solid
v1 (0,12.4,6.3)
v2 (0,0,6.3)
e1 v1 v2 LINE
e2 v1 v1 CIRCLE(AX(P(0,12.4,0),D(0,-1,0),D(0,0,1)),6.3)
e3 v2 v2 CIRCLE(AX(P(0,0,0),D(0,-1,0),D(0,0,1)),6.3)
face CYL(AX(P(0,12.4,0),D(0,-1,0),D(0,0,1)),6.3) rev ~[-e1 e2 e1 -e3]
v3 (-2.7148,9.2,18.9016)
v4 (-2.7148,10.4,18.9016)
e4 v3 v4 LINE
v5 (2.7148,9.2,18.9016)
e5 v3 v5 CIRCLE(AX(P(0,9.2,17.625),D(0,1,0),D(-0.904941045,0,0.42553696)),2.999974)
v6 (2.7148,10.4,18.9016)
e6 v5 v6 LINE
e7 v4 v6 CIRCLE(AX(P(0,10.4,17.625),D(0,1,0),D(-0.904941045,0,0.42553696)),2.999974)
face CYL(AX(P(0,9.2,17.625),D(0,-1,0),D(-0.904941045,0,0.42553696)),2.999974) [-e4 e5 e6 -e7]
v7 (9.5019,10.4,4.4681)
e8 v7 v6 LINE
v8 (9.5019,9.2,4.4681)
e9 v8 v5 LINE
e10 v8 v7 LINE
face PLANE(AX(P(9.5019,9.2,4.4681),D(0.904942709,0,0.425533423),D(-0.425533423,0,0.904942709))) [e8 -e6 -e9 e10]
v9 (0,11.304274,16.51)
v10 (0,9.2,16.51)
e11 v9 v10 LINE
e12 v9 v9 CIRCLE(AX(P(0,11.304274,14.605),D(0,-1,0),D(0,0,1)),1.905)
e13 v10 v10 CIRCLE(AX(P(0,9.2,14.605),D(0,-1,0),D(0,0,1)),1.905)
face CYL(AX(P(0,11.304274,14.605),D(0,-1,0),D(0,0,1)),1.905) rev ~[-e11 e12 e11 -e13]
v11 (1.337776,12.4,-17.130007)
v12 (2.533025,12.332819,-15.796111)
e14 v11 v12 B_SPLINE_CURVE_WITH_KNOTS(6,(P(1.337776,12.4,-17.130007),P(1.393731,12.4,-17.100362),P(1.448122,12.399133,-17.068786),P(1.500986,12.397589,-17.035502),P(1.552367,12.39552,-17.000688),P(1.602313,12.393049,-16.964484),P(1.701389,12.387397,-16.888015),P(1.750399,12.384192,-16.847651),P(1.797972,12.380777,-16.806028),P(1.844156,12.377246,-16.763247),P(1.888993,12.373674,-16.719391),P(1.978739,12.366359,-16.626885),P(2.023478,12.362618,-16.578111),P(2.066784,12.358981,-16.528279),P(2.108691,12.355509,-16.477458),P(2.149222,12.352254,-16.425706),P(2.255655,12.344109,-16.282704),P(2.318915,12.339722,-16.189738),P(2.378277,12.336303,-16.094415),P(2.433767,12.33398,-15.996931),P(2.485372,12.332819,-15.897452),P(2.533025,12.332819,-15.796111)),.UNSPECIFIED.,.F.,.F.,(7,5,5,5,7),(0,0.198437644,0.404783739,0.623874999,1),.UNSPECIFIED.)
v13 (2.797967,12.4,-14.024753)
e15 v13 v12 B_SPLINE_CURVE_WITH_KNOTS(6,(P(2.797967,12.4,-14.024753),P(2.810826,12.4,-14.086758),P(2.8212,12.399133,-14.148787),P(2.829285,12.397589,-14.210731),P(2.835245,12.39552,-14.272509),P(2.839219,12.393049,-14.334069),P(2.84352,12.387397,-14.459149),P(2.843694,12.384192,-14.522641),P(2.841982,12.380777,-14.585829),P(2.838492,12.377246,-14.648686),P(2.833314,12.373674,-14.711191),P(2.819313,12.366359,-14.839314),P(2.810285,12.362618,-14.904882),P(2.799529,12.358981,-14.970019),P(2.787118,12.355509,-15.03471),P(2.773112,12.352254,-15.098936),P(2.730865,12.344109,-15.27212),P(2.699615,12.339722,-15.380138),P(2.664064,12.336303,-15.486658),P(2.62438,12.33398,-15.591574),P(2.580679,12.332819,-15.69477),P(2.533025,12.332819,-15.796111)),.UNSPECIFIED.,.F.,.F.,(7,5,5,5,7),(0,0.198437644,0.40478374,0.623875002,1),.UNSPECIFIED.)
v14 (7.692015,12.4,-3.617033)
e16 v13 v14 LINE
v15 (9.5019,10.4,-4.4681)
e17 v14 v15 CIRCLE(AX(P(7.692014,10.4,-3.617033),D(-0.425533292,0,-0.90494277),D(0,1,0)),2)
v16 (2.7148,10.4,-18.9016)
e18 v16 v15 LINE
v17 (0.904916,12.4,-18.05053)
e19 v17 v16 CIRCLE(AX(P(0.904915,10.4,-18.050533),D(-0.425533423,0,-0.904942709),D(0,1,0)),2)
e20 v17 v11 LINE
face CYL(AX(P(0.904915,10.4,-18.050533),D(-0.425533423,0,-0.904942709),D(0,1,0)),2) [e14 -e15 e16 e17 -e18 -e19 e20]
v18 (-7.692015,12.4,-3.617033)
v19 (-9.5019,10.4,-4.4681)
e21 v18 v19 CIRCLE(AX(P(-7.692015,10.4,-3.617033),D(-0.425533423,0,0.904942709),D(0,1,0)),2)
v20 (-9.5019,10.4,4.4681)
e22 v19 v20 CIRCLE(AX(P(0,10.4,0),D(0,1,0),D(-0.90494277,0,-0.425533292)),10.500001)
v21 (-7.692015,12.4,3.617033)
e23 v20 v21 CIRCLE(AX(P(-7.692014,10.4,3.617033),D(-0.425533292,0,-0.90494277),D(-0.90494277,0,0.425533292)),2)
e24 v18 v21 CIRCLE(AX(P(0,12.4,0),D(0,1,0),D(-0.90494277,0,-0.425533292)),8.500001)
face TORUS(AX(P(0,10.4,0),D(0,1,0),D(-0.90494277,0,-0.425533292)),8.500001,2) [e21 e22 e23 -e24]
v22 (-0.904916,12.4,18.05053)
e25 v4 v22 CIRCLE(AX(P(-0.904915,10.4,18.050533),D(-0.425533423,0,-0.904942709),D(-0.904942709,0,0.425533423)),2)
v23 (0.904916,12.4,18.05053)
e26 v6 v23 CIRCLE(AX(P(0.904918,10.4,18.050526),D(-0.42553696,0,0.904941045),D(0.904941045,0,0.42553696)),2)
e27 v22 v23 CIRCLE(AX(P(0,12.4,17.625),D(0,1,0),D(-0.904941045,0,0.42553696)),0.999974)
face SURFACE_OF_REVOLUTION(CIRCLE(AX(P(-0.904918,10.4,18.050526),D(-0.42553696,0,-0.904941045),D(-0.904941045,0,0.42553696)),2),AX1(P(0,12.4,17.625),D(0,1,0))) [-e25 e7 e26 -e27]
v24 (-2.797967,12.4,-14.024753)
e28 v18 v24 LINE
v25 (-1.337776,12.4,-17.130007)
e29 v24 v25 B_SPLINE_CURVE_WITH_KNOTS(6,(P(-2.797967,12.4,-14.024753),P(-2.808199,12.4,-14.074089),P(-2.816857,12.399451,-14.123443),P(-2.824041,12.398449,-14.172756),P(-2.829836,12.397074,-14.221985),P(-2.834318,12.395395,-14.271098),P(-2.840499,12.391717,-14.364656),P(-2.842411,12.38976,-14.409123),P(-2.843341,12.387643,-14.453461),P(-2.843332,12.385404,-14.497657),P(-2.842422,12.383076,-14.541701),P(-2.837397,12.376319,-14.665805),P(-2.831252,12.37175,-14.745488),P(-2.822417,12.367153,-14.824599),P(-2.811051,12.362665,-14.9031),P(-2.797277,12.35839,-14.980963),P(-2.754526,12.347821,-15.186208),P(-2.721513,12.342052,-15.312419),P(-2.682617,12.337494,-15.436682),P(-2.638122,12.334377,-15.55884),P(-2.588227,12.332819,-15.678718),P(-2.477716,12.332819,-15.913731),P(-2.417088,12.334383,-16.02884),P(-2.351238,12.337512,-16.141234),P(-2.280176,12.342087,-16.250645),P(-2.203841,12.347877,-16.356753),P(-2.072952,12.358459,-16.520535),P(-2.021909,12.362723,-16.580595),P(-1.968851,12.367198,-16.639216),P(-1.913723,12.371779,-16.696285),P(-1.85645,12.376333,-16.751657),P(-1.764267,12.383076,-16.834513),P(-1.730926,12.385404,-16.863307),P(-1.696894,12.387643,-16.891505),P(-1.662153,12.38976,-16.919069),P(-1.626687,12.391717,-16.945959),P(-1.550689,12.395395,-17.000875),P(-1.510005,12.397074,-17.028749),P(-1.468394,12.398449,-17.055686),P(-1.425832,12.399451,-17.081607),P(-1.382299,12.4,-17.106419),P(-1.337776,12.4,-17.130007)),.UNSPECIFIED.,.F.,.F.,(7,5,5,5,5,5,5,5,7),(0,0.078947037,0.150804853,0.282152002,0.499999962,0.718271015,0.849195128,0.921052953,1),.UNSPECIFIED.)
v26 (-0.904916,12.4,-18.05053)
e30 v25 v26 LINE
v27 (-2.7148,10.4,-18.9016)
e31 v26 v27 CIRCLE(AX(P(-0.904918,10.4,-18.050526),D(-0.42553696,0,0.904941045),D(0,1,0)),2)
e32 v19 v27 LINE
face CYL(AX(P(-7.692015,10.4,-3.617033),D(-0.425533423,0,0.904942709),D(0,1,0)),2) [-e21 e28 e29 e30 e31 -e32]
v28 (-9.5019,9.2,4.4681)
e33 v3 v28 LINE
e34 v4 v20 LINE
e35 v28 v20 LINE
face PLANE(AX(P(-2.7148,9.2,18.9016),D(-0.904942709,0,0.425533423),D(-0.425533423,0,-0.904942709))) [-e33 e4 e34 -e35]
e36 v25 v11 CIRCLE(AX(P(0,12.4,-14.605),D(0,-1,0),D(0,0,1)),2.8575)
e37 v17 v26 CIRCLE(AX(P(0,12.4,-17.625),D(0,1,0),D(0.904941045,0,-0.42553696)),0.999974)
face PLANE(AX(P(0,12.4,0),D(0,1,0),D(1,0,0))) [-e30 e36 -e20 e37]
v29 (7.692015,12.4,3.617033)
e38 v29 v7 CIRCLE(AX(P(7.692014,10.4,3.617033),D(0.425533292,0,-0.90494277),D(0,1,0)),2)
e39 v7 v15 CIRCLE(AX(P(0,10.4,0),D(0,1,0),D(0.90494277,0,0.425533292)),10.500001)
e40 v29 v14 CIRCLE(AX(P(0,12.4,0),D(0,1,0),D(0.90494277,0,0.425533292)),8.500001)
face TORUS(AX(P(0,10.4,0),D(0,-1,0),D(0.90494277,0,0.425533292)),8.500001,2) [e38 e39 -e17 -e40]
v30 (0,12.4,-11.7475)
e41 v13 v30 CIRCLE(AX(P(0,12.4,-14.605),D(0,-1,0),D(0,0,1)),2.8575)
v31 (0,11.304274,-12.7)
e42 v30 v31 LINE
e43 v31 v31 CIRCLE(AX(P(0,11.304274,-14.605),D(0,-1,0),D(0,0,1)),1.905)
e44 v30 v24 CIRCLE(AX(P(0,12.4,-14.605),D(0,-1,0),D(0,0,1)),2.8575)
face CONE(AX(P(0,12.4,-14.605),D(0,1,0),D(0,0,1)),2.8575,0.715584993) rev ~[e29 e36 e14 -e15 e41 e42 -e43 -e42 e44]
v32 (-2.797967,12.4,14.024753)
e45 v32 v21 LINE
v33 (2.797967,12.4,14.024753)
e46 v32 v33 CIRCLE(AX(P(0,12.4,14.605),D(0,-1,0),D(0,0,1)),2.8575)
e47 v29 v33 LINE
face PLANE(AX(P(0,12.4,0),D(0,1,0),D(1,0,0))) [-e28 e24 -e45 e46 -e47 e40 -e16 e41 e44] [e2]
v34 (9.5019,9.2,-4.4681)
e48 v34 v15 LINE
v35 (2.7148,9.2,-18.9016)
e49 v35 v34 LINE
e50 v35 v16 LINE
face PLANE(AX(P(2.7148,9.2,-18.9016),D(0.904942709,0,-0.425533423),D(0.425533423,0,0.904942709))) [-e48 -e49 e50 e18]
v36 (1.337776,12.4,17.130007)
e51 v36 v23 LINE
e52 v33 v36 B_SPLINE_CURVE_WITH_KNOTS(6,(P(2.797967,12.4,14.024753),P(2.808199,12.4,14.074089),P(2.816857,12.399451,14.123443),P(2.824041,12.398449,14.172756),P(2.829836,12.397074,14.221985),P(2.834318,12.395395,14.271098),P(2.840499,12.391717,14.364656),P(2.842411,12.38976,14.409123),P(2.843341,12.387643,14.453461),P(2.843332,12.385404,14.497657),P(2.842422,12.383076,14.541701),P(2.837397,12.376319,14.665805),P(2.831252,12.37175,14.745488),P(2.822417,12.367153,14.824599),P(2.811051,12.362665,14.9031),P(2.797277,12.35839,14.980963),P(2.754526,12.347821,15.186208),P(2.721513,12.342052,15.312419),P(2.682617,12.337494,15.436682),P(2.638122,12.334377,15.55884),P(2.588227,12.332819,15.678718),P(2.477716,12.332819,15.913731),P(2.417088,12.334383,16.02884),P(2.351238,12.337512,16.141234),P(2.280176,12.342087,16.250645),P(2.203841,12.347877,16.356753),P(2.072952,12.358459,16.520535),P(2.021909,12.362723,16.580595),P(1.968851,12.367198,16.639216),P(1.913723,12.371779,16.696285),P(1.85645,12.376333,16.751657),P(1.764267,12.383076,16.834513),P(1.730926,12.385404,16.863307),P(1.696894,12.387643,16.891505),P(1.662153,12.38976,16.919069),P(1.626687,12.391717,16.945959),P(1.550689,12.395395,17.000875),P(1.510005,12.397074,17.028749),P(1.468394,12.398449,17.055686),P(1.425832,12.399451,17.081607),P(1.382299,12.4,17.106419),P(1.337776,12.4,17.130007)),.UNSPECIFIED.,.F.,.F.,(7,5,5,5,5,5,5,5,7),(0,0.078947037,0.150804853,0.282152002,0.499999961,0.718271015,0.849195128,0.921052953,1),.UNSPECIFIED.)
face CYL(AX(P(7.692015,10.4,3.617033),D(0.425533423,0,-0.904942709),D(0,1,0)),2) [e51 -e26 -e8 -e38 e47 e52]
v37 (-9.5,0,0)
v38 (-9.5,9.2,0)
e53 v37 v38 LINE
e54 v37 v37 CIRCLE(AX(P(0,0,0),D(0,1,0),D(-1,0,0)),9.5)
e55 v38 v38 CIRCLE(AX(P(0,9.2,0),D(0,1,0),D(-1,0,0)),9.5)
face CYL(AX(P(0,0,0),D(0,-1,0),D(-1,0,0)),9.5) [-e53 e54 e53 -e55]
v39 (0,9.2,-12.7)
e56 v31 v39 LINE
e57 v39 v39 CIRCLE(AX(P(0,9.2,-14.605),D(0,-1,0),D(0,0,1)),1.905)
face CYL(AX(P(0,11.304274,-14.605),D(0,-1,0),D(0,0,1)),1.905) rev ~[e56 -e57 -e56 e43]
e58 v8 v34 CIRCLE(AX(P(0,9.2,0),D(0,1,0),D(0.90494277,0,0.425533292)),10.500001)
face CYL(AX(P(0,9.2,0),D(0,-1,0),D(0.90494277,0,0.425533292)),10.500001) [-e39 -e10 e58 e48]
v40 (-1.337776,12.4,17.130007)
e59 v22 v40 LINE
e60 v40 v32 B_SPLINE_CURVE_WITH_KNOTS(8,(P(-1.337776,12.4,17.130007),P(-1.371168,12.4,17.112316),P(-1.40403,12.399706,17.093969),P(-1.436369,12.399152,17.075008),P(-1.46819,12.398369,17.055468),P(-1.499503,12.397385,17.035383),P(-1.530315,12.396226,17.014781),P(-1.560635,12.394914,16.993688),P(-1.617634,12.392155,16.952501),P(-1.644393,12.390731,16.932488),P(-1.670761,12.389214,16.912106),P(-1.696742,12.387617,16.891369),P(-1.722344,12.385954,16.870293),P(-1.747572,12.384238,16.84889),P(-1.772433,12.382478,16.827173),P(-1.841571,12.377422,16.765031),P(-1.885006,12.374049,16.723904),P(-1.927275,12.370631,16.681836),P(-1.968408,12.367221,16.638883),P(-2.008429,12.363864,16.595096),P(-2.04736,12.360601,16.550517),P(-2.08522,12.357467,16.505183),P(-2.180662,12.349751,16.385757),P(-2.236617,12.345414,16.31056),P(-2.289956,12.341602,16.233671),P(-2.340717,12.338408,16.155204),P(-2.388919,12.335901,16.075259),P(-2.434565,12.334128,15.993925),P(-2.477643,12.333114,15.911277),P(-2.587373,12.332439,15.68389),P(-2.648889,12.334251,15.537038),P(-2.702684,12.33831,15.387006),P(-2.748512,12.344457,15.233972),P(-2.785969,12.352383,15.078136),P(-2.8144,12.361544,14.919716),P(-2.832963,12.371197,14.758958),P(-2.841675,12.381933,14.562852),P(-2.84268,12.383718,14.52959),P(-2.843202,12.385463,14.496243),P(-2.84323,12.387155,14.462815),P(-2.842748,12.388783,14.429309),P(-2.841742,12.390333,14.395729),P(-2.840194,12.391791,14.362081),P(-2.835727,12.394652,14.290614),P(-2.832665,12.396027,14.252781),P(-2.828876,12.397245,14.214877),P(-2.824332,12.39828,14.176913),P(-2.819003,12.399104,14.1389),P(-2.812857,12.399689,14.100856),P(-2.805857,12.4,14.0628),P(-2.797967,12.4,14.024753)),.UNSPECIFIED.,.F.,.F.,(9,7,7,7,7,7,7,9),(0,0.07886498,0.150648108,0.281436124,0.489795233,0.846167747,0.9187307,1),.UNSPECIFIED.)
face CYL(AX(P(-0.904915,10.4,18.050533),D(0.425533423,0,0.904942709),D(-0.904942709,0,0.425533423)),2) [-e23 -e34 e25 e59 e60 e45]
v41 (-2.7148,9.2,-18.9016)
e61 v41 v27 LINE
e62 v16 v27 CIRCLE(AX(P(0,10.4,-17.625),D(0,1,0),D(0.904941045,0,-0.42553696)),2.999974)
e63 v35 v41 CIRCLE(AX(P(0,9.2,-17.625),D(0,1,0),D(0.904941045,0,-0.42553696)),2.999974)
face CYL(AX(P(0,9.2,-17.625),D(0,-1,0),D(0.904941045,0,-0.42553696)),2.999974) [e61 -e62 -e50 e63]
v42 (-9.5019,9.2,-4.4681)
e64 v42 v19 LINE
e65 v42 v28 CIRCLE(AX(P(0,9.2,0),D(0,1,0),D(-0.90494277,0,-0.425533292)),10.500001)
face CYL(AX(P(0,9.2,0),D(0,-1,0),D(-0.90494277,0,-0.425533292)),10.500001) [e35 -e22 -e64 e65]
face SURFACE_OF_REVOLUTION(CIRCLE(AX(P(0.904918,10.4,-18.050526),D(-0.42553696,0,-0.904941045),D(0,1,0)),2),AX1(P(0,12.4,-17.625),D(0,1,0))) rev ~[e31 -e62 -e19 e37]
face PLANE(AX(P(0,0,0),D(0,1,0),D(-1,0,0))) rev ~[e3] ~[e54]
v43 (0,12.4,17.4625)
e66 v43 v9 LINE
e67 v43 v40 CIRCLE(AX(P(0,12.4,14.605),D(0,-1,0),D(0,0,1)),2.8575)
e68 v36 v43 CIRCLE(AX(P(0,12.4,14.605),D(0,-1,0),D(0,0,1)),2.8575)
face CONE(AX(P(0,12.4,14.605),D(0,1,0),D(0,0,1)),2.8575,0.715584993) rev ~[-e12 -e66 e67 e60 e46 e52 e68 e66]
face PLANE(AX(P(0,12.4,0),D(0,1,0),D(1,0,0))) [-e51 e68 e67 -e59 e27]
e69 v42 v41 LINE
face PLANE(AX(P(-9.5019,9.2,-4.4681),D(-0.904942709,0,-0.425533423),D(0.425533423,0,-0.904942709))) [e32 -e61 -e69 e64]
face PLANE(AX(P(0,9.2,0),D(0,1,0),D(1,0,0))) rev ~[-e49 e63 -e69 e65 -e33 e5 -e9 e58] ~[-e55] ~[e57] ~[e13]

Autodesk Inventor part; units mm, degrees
ref_plane "YZ Plane" through (0, 0, 0) normal (1, 0, 0) x (0, 1, 0)
ref_plane "XZ Plane" through (0, 0, 0) normal (0, 1, 0) x (-1, 0, 0)
ref_plane "XY Plane" through (0, 0, 0) normal (0, 0, 1) x (1, 0, 0)
sketch "Sketch1" plane through (0, 0, 0) normal (0, 1, 0) x (-1, 0, 0)
  circle A0 centre (0, 0) radius 9.5
  dimension "Cutout_Diameter" = 19
extrude "Extrusion1" add sketch "Sketch1" along normal blind 9.2
sketch "Sketch2" plane through (0, 9.2, 0) normal (0, 1, 0) x (1, 0, 0)
  line L0 (0, 0) -> (0, 17.625) construction
  line L1 (0, 0) -> (0, -17.625) construction
  arc A0 (-2.7148, -18.9016) -> (2.7148, -18.9016) centre (0, -17.625) ccw
  arc A1 (2.7148, 18.9016) -> (-2.7148, 18.9016) centre (0, 17.625) ccw
  line L2 (-2.7148, -18.9016) -> (-9.5019, -4.4681)
  line L3 (-9.5019, 4.4681) -> (-2.7148, 18.9016)
  line L4 (2.7148, 18.9016) -> (9.5019, 4.4681)
  line L5 (9.5019, -4.4681) -> (2.7148, -18.9016)
  arc A2 (9.5019, -4.4681) -> (9.5019, 4.4681) centre (0, 0) ccw
  arc A3 (-9.5019, 4.4681) -> (-9.5019, -4.4681) centre (0, 0) ccw
  dimension "Mount_Tip_Radius" = 6
  dimension "Mount_Center_Radius" = 10.5
  dimension "Mount_Tip_Length" = 41.25
extrude "Extrusion2" add sketch "Sketch2" along normal blind 3.2
sketch "Sketch3" plane through (0, 12.4, 0) normal (0, 1, 0) x (1, 0, 0)
  line L0 (0, -14.605) -> (0, 14.605) construction
  point P0 (0, 0)
  point P1 (0, 0)
  dimension "Mount_Hole_Spacing" = 29.21
hole "Hole1" at (0, 12.4, 14.605) at (0, 12.4, -14.605) direction (0, -1, 0) diameter 3.81 end through all countersink diameter 5.715 countersink angle 82
sketch "Sketch4" plane through (0, 12.4, 0) normal (0, 1, 0) x (1, 0, 0)
  point P0 (0, 0)
  point P1 (0, 0)
hole "Hole2" at (0, 12.4, 0) direction (0, -1, 0) diameter 12.6 end through all
fillet "Fillet1" radius 2 8 edges at (10.5, 12.4, 0) (6.1084, 12.4, -11.6848) (0, 12.4, -20.625) (-6.1084, 12.4, -11.6848) (-10.5, 12.4, 0) (-6.1084, 12.4, 11.6848) (0, 12.4, 20.625) (6.1084, 12.4, 11.6848)
properties part number "Deck_Bushing_Outer" material "Nylon 6/6"
